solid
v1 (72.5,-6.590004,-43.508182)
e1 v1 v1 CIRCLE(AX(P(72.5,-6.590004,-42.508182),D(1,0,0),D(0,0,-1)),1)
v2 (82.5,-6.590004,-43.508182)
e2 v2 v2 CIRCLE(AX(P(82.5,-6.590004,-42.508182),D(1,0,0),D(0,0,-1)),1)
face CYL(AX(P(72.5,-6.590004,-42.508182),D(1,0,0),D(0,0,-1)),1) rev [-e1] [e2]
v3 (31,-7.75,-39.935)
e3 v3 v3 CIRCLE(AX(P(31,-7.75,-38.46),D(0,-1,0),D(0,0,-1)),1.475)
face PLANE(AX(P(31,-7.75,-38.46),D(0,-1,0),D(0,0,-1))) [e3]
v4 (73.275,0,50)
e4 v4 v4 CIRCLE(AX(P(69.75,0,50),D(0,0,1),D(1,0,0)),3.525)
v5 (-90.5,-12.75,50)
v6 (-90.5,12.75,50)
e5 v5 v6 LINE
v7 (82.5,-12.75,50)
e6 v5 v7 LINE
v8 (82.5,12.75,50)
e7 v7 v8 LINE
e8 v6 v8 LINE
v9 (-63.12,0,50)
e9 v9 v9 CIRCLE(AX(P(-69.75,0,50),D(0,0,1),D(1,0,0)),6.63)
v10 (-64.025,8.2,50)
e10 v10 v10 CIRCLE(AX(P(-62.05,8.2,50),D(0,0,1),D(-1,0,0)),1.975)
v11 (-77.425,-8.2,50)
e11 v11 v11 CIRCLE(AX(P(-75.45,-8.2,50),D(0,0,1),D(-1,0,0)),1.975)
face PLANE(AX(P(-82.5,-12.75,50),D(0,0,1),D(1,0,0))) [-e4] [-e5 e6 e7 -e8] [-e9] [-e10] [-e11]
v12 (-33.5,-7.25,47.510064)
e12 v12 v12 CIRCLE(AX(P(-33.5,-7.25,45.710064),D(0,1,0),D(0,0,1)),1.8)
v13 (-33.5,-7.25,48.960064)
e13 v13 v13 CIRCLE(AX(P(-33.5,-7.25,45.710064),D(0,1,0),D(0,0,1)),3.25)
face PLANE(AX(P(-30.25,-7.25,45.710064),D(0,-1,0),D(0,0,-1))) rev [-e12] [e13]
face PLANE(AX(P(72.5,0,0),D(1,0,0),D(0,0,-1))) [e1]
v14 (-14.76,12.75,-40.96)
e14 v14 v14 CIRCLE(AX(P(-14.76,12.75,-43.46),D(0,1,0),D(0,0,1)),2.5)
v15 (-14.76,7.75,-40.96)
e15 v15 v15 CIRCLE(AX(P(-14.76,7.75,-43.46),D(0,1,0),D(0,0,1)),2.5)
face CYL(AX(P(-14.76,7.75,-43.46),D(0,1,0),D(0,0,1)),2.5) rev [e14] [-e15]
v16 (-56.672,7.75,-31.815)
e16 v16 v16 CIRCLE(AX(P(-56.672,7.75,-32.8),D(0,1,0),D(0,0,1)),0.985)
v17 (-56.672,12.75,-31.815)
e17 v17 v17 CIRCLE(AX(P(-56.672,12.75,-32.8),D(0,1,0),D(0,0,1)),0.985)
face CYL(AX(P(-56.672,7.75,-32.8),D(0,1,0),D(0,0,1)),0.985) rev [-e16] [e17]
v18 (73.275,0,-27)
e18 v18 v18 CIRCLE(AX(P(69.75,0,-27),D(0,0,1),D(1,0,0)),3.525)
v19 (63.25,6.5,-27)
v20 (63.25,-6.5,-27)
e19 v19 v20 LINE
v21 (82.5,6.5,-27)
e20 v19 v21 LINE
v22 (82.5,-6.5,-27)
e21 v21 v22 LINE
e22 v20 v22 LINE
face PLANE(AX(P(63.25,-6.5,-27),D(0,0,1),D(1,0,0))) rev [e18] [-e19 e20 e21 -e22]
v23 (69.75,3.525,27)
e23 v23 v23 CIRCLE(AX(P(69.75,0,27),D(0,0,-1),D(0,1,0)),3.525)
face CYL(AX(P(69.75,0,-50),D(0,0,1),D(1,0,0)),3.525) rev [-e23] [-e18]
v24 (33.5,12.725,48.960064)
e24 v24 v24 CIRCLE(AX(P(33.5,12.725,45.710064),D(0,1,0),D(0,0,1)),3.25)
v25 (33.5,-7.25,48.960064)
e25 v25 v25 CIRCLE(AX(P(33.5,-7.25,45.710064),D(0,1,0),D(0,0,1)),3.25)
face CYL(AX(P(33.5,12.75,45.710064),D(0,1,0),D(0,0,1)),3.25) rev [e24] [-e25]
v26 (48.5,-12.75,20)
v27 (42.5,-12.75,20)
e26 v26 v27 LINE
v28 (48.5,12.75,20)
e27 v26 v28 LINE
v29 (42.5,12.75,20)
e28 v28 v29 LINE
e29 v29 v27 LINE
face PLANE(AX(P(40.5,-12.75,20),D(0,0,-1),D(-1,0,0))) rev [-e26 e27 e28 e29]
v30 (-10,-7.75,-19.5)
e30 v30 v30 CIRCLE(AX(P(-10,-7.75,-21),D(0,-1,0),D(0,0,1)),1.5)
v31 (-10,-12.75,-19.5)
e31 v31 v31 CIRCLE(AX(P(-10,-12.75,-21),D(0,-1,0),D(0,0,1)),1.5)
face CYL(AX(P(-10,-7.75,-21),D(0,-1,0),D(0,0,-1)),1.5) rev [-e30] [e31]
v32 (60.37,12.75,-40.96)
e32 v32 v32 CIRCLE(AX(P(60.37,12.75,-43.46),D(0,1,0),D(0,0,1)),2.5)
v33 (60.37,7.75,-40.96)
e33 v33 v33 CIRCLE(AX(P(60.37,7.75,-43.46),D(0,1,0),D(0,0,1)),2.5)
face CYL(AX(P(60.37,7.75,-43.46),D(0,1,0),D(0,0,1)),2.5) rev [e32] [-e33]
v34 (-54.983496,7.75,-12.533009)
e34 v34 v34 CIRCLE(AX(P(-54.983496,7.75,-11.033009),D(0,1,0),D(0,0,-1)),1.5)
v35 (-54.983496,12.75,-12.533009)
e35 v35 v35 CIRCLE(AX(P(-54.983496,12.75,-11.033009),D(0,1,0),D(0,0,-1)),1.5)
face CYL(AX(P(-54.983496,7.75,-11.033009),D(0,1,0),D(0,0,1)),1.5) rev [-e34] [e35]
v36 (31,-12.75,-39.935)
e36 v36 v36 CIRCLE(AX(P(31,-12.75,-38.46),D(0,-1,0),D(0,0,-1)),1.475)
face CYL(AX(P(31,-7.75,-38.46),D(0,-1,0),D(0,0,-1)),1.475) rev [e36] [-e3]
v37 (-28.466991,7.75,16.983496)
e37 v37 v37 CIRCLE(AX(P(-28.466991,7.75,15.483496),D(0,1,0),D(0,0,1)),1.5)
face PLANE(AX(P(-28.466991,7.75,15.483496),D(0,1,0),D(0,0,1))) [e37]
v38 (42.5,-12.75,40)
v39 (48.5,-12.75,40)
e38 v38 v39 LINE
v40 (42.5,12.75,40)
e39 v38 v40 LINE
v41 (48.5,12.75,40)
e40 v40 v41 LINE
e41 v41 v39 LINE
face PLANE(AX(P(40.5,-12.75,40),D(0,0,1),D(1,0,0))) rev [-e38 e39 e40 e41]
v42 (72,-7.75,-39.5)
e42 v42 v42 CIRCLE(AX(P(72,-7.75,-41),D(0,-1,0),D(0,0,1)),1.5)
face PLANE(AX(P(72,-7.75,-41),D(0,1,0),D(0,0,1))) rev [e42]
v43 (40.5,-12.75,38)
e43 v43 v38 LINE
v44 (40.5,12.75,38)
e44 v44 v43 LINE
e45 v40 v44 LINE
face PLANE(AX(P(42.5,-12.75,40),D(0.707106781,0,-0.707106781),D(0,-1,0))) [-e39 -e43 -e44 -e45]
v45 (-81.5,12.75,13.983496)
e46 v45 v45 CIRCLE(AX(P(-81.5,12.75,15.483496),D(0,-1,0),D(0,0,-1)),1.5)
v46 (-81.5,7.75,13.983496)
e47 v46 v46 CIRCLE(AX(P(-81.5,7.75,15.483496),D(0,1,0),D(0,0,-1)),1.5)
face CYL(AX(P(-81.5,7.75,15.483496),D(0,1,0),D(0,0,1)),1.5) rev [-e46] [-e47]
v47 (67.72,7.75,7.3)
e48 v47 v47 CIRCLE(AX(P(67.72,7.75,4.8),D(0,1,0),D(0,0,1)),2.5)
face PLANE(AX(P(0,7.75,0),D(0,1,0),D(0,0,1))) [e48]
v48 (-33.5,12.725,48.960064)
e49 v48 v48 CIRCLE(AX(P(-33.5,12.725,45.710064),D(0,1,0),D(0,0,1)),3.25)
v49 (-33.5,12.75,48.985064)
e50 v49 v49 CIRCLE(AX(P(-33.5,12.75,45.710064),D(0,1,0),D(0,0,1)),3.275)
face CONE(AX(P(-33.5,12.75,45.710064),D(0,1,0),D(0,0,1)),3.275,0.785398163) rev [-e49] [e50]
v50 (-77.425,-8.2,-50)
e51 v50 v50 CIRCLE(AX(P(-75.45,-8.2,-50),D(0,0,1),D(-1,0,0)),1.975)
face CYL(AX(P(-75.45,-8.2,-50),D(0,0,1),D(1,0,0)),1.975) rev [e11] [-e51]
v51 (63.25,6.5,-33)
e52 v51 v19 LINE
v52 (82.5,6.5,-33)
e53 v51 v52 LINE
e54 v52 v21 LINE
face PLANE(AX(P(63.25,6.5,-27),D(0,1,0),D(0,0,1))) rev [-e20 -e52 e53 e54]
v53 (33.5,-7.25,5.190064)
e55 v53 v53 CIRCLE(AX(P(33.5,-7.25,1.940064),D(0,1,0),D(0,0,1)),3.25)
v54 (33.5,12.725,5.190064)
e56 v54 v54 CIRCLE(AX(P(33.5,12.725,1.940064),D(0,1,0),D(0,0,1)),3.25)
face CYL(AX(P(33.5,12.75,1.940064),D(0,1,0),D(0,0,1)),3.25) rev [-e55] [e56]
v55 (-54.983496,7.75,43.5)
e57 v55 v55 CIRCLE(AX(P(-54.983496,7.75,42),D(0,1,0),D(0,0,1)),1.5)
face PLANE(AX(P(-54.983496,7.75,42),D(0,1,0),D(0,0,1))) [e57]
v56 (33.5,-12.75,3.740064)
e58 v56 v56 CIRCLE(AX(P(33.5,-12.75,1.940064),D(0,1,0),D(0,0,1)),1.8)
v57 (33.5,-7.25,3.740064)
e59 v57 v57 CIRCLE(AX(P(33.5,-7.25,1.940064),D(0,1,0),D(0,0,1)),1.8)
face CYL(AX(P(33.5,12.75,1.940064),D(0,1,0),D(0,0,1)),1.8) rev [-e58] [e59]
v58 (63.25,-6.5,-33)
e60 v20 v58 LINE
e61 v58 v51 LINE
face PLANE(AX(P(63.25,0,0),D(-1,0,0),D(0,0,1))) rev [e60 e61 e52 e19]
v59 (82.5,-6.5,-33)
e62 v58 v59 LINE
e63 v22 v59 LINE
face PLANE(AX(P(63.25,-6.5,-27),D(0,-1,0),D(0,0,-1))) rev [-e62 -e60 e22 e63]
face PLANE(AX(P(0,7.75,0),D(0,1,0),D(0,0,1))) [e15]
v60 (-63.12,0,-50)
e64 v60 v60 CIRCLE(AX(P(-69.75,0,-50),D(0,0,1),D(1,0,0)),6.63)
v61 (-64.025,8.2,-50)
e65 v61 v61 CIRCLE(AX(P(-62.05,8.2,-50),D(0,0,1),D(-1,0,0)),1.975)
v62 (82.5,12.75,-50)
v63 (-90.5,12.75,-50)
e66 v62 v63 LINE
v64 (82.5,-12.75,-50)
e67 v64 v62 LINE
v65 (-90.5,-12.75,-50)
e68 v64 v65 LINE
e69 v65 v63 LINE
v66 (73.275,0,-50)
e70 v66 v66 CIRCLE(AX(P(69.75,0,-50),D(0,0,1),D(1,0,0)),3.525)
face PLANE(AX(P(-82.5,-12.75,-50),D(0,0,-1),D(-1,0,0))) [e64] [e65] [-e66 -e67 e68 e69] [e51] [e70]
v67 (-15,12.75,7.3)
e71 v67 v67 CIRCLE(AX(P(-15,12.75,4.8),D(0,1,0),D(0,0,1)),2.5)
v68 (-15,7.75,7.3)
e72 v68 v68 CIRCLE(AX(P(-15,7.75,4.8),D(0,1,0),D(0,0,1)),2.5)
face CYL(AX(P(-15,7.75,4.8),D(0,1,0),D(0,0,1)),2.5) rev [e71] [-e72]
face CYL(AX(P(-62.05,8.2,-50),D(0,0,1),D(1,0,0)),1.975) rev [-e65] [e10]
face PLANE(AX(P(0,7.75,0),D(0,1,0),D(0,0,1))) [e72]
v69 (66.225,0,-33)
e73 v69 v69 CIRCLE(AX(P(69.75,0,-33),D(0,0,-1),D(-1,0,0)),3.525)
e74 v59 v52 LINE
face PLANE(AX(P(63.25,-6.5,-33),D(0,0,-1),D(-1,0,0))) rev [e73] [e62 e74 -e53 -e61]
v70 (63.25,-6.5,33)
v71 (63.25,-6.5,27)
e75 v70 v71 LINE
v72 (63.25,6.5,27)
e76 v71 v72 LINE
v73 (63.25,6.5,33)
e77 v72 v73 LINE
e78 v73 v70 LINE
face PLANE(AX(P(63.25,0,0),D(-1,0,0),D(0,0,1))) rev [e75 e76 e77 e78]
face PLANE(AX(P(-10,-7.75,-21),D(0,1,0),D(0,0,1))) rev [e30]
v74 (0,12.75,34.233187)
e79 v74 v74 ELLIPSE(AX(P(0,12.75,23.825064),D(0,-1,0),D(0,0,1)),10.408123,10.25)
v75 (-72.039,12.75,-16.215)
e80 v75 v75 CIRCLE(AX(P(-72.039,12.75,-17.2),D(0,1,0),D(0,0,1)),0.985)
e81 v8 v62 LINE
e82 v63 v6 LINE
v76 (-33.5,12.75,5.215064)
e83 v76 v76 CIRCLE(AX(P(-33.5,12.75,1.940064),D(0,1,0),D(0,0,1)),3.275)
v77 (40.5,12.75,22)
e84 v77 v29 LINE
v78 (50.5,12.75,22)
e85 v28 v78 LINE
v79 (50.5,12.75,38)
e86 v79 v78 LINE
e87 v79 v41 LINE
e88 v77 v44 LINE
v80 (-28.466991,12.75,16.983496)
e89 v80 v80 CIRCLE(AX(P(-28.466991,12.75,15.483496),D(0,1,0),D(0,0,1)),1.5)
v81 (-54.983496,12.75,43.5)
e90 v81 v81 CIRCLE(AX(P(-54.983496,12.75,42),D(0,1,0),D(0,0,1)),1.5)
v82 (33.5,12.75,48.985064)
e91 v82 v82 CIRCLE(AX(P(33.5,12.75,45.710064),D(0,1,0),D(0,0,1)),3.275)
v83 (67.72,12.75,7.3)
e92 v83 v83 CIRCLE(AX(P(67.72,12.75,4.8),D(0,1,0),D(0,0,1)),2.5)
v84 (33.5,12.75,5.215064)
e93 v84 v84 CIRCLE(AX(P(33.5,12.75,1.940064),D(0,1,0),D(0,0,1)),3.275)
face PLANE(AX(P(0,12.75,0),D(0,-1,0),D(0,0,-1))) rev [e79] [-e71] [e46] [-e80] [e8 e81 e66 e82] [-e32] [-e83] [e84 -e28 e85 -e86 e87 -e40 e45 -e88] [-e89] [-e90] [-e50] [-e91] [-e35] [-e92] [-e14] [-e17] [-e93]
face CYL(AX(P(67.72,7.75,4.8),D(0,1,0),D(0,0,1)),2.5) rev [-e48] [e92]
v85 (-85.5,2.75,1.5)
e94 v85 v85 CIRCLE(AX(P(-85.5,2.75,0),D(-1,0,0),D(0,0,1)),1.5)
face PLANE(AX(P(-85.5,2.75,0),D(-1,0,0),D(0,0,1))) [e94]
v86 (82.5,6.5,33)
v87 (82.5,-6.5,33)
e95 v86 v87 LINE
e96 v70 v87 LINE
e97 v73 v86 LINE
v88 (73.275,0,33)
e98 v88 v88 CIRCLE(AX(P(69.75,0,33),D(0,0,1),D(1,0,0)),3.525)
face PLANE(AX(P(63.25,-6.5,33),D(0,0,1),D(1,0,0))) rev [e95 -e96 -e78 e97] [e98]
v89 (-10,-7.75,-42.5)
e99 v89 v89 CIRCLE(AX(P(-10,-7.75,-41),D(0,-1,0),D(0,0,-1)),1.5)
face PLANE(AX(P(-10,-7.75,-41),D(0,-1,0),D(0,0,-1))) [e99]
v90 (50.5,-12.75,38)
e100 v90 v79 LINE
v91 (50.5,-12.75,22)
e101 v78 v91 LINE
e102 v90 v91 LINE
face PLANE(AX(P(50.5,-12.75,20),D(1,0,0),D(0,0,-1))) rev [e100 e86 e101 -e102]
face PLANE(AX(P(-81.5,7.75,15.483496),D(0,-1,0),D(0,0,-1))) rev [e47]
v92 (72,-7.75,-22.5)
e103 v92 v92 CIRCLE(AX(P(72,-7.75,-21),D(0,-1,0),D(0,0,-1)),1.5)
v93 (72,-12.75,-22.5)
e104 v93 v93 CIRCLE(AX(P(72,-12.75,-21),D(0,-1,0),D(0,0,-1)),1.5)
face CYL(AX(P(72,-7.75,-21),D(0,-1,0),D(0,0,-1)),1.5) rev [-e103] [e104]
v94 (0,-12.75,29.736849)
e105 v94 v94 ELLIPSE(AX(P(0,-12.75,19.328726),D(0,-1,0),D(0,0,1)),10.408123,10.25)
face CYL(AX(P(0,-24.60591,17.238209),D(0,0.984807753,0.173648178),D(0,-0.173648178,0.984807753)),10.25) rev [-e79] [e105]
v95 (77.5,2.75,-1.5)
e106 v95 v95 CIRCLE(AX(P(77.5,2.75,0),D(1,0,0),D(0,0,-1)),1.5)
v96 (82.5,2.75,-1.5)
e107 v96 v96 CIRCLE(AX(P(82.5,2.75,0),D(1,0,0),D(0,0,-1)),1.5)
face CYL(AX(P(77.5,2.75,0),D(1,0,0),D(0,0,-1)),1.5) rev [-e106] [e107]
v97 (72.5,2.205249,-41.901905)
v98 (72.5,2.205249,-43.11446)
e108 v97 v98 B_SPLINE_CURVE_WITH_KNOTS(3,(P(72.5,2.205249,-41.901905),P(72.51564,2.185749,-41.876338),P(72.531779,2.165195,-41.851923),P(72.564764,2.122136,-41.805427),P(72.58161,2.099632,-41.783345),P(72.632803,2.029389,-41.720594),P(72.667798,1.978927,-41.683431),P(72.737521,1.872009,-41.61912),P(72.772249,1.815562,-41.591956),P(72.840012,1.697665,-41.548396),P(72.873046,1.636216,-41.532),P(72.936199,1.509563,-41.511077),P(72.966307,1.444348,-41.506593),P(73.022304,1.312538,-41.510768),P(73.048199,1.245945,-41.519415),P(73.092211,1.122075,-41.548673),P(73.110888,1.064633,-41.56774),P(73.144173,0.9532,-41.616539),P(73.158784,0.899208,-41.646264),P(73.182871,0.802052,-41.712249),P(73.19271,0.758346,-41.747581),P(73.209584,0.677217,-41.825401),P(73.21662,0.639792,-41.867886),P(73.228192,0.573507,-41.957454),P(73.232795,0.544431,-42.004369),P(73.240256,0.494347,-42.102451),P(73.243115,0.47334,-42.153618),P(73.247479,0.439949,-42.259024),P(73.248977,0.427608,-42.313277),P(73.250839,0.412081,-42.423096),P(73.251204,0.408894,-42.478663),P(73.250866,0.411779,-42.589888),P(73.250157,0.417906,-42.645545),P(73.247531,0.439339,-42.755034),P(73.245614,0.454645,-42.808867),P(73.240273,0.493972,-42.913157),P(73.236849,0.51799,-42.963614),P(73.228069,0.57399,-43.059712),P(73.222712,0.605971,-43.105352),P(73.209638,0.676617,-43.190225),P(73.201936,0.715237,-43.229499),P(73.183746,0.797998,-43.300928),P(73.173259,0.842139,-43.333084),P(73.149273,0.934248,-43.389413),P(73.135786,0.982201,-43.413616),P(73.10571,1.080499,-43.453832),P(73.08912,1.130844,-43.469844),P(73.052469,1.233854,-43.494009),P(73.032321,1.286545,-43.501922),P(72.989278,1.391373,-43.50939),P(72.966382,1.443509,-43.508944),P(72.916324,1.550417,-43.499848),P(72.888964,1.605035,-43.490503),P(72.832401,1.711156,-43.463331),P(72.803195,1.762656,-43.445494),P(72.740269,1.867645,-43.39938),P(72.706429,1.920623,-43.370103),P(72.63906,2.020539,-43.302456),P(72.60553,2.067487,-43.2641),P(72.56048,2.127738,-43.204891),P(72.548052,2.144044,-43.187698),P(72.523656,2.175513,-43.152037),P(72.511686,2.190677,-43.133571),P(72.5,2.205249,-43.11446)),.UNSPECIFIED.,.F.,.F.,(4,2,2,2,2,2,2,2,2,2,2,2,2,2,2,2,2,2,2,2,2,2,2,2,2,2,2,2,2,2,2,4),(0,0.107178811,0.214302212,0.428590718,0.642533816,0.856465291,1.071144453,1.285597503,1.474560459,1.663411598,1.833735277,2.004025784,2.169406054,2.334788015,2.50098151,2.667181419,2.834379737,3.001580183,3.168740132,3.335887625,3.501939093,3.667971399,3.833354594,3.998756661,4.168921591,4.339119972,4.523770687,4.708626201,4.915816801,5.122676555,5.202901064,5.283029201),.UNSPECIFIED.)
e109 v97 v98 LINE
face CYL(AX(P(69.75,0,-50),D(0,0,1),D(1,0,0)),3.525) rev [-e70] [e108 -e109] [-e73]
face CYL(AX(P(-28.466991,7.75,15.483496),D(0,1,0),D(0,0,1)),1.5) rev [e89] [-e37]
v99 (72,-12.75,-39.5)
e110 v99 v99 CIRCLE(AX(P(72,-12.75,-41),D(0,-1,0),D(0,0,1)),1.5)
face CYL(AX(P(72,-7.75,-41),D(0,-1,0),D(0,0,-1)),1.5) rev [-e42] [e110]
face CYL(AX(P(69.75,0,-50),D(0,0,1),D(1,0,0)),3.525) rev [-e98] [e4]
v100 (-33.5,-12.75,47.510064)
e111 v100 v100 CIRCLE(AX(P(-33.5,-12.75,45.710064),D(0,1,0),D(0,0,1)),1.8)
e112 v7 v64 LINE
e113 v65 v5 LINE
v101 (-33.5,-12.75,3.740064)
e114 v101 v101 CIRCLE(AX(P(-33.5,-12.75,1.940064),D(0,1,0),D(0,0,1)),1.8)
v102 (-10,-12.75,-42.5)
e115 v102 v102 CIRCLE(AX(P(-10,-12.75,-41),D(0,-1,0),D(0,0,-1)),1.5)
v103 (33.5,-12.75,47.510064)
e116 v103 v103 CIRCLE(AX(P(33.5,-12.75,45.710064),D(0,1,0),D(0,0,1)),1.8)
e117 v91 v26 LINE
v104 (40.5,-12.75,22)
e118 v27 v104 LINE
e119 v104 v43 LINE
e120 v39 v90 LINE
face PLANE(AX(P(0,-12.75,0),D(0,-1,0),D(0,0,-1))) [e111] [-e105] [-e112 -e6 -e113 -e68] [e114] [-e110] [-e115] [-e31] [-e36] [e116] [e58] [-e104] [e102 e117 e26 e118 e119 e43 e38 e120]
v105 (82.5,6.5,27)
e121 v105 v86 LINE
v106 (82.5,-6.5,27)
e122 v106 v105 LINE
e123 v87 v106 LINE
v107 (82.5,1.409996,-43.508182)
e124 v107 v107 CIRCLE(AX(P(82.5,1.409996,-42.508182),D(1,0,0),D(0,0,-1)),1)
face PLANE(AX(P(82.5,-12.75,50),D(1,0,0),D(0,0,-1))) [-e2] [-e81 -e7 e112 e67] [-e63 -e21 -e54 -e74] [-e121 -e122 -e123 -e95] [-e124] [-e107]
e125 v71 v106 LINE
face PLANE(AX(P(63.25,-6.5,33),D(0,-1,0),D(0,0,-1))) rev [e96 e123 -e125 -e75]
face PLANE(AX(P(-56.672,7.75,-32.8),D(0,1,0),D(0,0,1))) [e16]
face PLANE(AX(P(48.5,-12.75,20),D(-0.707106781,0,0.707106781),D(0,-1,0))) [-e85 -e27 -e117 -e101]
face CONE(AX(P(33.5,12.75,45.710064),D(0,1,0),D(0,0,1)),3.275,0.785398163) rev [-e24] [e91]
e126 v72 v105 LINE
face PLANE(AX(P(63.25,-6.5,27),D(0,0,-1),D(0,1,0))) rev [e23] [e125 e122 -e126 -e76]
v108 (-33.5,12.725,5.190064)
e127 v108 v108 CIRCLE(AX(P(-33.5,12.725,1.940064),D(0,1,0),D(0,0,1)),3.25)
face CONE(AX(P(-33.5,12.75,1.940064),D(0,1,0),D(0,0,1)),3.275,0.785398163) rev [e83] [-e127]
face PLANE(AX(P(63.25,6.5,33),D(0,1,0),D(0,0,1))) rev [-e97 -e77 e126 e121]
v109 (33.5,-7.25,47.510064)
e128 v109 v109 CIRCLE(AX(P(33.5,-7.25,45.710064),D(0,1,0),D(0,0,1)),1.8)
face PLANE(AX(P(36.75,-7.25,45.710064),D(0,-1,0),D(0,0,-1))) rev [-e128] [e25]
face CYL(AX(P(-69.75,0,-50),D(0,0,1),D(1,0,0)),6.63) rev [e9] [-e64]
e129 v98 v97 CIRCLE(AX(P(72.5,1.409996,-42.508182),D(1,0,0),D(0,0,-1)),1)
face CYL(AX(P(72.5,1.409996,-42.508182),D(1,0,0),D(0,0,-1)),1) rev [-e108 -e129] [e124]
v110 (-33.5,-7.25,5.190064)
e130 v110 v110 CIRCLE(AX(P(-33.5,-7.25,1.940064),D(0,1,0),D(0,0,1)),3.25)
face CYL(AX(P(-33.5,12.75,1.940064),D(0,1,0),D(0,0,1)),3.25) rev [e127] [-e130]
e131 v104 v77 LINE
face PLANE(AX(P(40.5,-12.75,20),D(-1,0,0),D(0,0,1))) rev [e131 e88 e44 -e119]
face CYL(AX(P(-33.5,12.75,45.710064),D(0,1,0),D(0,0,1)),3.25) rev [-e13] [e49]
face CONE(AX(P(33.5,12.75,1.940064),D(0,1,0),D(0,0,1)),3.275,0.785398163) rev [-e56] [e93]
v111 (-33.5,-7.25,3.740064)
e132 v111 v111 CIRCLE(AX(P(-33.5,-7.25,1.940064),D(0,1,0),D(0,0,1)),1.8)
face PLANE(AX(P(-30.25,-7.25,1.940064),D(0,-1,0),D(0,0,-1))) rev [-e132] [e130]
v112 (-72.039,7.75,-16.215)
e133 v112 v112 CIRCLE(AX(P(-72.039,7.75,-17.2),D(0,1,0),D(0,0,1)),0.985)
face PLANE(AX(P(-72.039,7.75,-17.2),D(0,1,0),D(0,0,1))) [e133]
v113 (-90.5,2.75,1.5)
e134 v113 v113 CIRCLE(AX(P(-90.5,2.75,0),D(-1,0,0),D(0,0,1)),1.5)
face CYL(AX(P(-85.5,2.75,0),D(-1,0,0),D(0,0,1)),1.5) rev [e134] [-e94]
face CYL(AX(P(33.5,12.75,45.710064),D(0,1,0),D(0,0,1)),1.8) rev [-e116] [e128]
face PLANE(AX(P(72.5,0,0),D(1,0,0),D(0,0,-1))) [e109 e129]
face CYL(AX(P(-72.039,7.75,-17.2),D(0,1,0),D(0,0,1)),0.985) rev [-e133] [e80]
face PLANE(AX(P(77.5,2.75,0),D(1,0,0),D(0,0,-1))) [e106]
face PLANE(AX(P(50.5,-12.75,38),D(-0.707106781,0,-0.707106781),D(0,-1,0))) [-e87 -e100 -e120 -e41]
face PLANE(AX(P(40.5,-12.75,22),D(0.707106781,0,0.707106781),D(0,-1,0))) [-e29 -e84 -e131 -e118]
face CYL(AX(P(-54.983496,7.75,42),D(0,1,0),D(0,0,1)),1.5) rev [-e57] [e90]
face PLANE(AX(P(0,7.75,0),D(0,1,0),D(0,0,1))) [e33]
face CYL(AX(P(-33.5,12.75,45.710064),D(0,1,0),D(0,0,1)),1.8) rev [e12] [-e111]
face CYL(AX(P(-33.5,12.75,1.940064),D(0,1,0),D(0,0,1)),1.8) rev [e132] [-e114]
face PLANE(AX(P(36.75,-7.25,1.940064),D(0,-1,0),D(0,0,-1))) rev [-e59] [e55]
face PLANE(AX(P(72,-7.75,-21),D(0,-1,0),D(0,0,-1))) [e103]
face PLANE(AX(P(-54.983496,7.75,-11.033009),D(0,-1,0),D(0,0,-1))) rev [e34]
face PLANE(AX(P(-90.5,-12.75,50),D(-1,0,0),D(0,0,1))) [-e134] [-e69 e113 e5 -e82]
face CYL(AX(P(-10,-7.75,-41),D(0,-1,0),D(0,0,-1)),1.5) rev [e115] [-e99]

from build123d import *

# Parameters (mm, degrees)
BOSS_EXTRUDE1_DEPTH           = 12.75
BOSS_EXTRUDE1_DEPTH_BACK      = 12.75
SKETCH1_W                     = 165
SKETCH1_H                     = 100
SKETCH5_W                     = 6
SKETCH5_H                     = 13
CUT_EXTRUDE3_DEPTH            = 19.25
SKETCH6_R                     = 10.25
CUT_EXTRUDE4_DEPTH            = 105.029133509
SKETCH11_R                    = 1.5
CUT_EXTRUDE6_DEPTH            = 5
SKETCH2_R                     = 6.63
SKETCH2_R_2                   = 3.525
SKETCH2_R_3                   = 1.975
CUT_EXTRUDE7_DEPTH            = 131.264394598
SKETCH3_R                     = 2.5
CUT_EXTRUDE8_DEPTH            = 5
SKETCH12_R                    = 0.985
CUT_EXTRUDE9_DEPTH            = 5
MOVE_START                    = -12.75
MOVE_FACE1_DEPTH              = 25.5
MOVE_FACE1_2_DEPTH            = 20.5
SKETCH13_W                    = 10
SKETCH13_H                    = 20
CUT_EXTRUDE10_DEPTH           = 107.491783721
CHAMFER1_SIZE                 = 2
SKETCH14_R                    = 1.5
CUT_EXTRUDE11_DEPTH           = 5
CUT_EXTRUDE12_START           = -5
SKETCH15_R                    = 1.5
CUT_EXTRUDE12_DEPTH           = 5
CUT_EXTRUDE15_START           = -25.5
SKETCH17_R                    = 1.5
CUT_EXTRUDE15_DEPTH           = 132.991783721
SKETCH18_R                    = 1.475
SKETCH18_R_2                  = 1.5
CUT_EXTRUDE16_DEPTH           = 5
SKETCH16_R                    = 1
CUT_EXTRUDE13_DEPTH           = 10
CBORE_FOR_M3_SHCS1_AT_2_COUNT = 2
CBORE_FOR_M3_SHCS1_AT_2_PITCH = 43.77
CBORE_FOR_M3_SHCS1_AT_3_COUNT = 2
CBORE_FOR_M3_SHCS1_AT_3_PITCH = 80.030074972
CBORE_FOR_M3_SHCS1_AT_4_COUNT = 2
CBORE_FOR_M3_SHCS1_AT_4_PITCH = 67


# Read off the part's stored shape, not the designer's step: Move Face1
with BuildPart() as part:
    # Sketch1 → Boss-Extrude1 (new, two sides: drawn at the far end of the back side and taken through both)
    with BuildSketch(Plane(origin=(0, 0, 0), x_dir=(1, 0, 0), z_dir=(0, 1, 0)).offset(-BOSS_EXTRUDE1_DEPTH_BACK)):
        Rectangle(SKETCH1_W, SKETCH1_H)
    extrude(amount=BOSS_EXTRUDE1_DEPTH + BOSS_EXTRUDE1_DEPTH_BACK)

    # Sketch5 → Cut-Extrude3 (cut)
    with BuildSketch(Plane(origin=(82.5, 0, 0), x_dir=(0, 0, -1), z_dir=(1, 0, 0))):
        with Locations((-30, 0)):
            Rectangle(SKETCH5_W, SKETCH5_H)
        with Locations((30, 0)):
            Rectangle(SKETCH5_W, SKETCH5_H)
    extrude(amount=-CUT_EXTRUDE3_DEPTH, mode=Mode.SUBTRACT)

    # Sketch6 → Cut-Extrude4 (cut, through all)
    with BuildSketch(Plane(origin=(0, 20.916044041, 3.688062894), x_dir=(1, 0, 0), z_dir=(0, 0.984807753012208, 0.17364817766693072))):
        with Locations(Location((0, -21.249093385, 0), (0, 0, 270))):
            Circle(SKETCH6_R)
    extrude(amount=-CUT_EXTRUDE4_DEPTH, mode=Mode.SUBTRACT)

    # Sketch11 → Cut-Extrude6 (cut)
    with BuildSketch(Plane(origin=(0, 12.75, 0), x_dir=(1, 0, 0), z_dir=(0, 1, 0))):
        with Locations(Location((-28.466991411, -15.483495706, 0), (0, 0, 270))):
            Circle(SKETCH11_R)
        with Locations(Location((-54.983495706, -42, 0), (0, 0, 270))):
            Circle(SKETCH11_R)
        with Locations(Location((-54.983495706, 11.033008589, 0), (0, 0, 90))):
            Circle(SKETCH11_R)
        with Locations((-81.5, -15.483495706)):
            Circle(SKETCH11_R)
    extrude(amount=-CUT_EXTRUDE6_DEPTH, mode=Mode.SUBTRACT)

    # Sketch2 → Cut-Extrude7 (cut, through all)
    with BuildSketch(Plane.XY.offset(50)):
        with Locations((-69.75, 0)):
            Circle(SKETCH2_R)
        with Locations((69.75, 0)):
            Circle(SKETCH2_R_2)
        with Locations(Location((-75.45, -8.2, 0), (0, 0, 180))):
            Circle(SKETCH2_R_3)
        with Locations(Location((-62.05, 8.2, 0), (0, 0, 180))):
            Circle(SKETCH2_R_3)
    extrude(amount=-CUT_EXTRUDE7_DEPTH, mode=Mode.SUBTRACT)

    # Sketch3 → Cut-Extrude8 (cut)
    with BuildSketch(Plane(origin=(0, 12.75, 0), x_dir=(1, 0, 0), z_dir=(0, 1, 0))):
        with Locations(Location((-15, -4.8, 0), (0, 0, 270))):
            Circle(SKETCH3_R)
        with Locations(Location((67.72, -4.8, 0), (0, 0, 270))):
            Circle(SKETCH3_R)
        with Locations(Location((60.37, 43.46, 0), (0, 0, 270))):
            Circle(SKETCH3_R)
        with Locations(Location((-14.76, 43.46, 0), (0, 0, 270))):
            Circle(SKETCH3_R)
    extrude(amount=-CUT_EXTRUDE8_DEPTH, mode=Mode.SUBTRACT)

    # Sketch12 → Cut-Extrude9 (cut)
    with BuildSketch(Plane(origin=(0, 12.75, 0), x_dir=(1, 0, 0), z_dir=(0, 1, 0))):
        with Locations(Location((-56.672, 32.8, 0), (0, 0, 270))):
            Circle(SKETCH12_R)
        with Locations(Location((-72.039, 17.2, 0), (0, 0, 270))):
            Circle(SKETCH12_R)
    extrude(amount=-CUT_EXTRUDE9_DEPTH, mode=Mode.SUBTRACT)

    # Move Face1 outline → Move Face1 (add)
    with BuildSketch(Plane(origin=(0, 0, 0), x_dir=(1, 0, 0), z_dir=(0, 1, 0)).offset(MOVE_START)):
        with BuildLine():
            Line((-82.5, 50), (-90.5, 50))
            Line((-90.5, 50), (-90.5, -50))
            Line((-90.5, -50), (-82.5, -50))
            Line((-82.5, -50), (-82.5, -16.601529694))
            ThreePointArc((-82.5, -16.601529694), (-83, -15.483495706), (-82.5, -14.365461717))
            Line((-82.5, -14.365461717), (-82.5, 50))
        make_face()
    extrude(amount=MOVE_FACE1_DEPTH)

    # Move Face1 2 outline → Move Face1 2 (add)
    with BuildSketch(Plane(origin=(0, 0, 0), x_dir=(1, 0, 0), z_dir=(0, 1, 0)).offset(MOVE_START)):
        with BuildLine():
            Line((-82.5, -16.601529694), (-82.5, -14.365461717))
            ThreePointArc((-82.5, -14.365461717), (-83, -15.483495706), (-82.5, -16.601529694))
        make_face()
    extrude(amount=MOVE_FACE1_2_DEPTH)

    # Sketch13 → Cut-Extrude10 (cut, through all)
    with BuildSketch(Plane(origin=(0, 12.75, 0), x_dir=(1, 0, 0), z_dir=(0, 1, 0))):
        with Locations((45.5, -30)):
            Rectangle(SKETCH13_W, SKETCH13_H)
    extrude(amount=-CUT_EXTRUDE10_DEPTH, mode=Mode.SUBTRACT)

    # Chamfer1
    chamfer1_edges = [part.edges().sort_by_distance(p)[0] for p in [
        (40.5, 0, 40),
        (40.5, 0, 20),
        (50.5, 0, 20),
        (50.5, 0, 40),
    ]]
    chamfer(chamfer1_edges, length=CHAMFER1_SIZE)

    # Sketch14 → Cut-Extrude11 (cut)
    with BuildSketch(Plane(origin=(82.5, 0, 0), x_dir=(0, 0, -1), z_dir=(1, 0, 0))):
        with Locations((0, 2.75)):
            Circle(SKETCH14_R)
    extrude(amount=-CUT_EXTRUDE11_DEPTH, mode=Mode.SUBTRACT)

    # Sketch15 → Cut-Extrude12 (cut)
    with BuildSketch(Plane.ZY.offset(90.5).offset(CUT_EXTRUDE12_START)):
        with Locations(Location((0, 2.75, 0), (0, 0, 180))):
            Circle(SKETCH15_R)
    extrude(amount=CUT_EXTRUDE12_DEPTH, mode=Mode.SUBTRACT)

    # Sketch17 → Cut-Extrude15 (cut, through all)
    with BuildSketch(Plane(origin=(0, 12.75, 0), x_dir=(1, 0, 0), z_dir=(0, 1, 0)).offset(CUT_EXTRUDE15_START)):
        with Locations(Location((33.5, -1.940063906, 0), (0, 0, 90))):
            Circle(SKETCH17_R)
        with Locations(Location((33.5, -45.710063906, 0), (0, 0, 90))):
            Circle(SKETCH17_R)
        with Locations(Location((-33.5, -45.710063906, 0), (0, 0, 90))):
            Circle(SKETCH17_R)
        with Locations(Location((-33.5, -1.940063906, 0), (0, 0, 90))):
            Circle(SKETCH17_R)
    extrude(amount=CUT_EXTRUDE15_DEPTH, mode=Mode.SUBTRACT)

    # Sketch18 → Cut-Extrude16 (cut)
    with BuildSketch(Plane.XZ.offset(12.75)):
        with Locations(Location((31, -38.46, 0), (0, 0, 270))):
            Circle(SKETCH18_R)
        with Locations(Location((72, -21, 0), (0, 0, 270))):
            Circle(SKETCH18_R_2)
        with Locations(Location((72, -41, 0), (0, 0, 90))):
            Circle(SKETCH18_R_2)
        with Locations(Location((-10, -21, 0), (0, 0, 90))):
            Circle(SKETCH18_R_2)
        with Locations(Location((-10, -41, 0), (0, 0, 270))):
            Circle(SKETCH18_R_2)
    extrude(amount=-CUT_EXTRUDE16_DEPTH, mode=Mode.SUBTRACT)

    # Sketch16 → Cut-Extrude13 (cut)
    with BuildSketch(Plane(origin=(82.5, 0, 0), x_dir=(0, 0, -1), z_dir=(1, 0, 0))):
        with Locations((42.508182421, -6.590003662)):
            Circle(SKETCH16_R)
        with Locations((42.508182421, 1.409996338)):
            Circle(SKETCH16_R)
    extrude(amount=-CUT_EXTRUDE13_DEPTH, mode=Mode.SUBTRACT)

    # Sketch22 → CBORE for M3 SHCS1 (revolve, cut)
    with BuildSketch(Plane(origin=(33.5, 12.75, 1.940063906), x_dir=(0, 0, 1), z_dir=(1, 0, 0))):
        Polygon((0, 0), (0, 25.5), (1.8, 25.5), (1.8, 20), (3.25, 20), (3.25, 0.025), (3.275, 0), align=None)
    cbore_for_m3_shcs1 = revolve(axis=Axis((33.5, 19.1, 1.940063906), (0, -1, 0)), mode=Mode.SUBTRACT)

    # CBORE for M3 SHCS1 at 2: CBORE for M3 SHCS1 ×2
    with Locations(*[(0, 0, i * CBORE_FOR_M3_SHCS1_AT_2_PITCH) for i in range(1, CBORE_FOR_M3_SHCS1_AT_2_COUNT)]):
        add(cbore_for_m3_shcs1, mode=Mode.SUBTRACT)

    # CBORE for M3 SHCS1 at 3: CBORE for M3 SHCS1 ×2
    with Locations(*[Vector(-0.8371852709567797, 0, 0.5469193926832577) * (i * CBORE_FOR_M3_SHCS1_AT_3_PITCH) for i in range(1, CBORE_FOR_M3_SHCS1_AT_3_COUNT)]):
        add(cbore_for_m3_shcs1, mode=Mode.SUBTRACT)

    # CBORE for M3 SHCS1 at 4: CBORE for M3 SHCS1 ×2
    with Locations(*[(-i * CBORE_FOR_M3_SHCS1_AT_4_PITCH, 0, 0) for i in range(1, CBORE_FOR_M3_SHCS1_AT_4_COUNT)]):
        add(cbore_for_m3_shcs1, mode=Mode.SUBTRACT)


solid = part.part
